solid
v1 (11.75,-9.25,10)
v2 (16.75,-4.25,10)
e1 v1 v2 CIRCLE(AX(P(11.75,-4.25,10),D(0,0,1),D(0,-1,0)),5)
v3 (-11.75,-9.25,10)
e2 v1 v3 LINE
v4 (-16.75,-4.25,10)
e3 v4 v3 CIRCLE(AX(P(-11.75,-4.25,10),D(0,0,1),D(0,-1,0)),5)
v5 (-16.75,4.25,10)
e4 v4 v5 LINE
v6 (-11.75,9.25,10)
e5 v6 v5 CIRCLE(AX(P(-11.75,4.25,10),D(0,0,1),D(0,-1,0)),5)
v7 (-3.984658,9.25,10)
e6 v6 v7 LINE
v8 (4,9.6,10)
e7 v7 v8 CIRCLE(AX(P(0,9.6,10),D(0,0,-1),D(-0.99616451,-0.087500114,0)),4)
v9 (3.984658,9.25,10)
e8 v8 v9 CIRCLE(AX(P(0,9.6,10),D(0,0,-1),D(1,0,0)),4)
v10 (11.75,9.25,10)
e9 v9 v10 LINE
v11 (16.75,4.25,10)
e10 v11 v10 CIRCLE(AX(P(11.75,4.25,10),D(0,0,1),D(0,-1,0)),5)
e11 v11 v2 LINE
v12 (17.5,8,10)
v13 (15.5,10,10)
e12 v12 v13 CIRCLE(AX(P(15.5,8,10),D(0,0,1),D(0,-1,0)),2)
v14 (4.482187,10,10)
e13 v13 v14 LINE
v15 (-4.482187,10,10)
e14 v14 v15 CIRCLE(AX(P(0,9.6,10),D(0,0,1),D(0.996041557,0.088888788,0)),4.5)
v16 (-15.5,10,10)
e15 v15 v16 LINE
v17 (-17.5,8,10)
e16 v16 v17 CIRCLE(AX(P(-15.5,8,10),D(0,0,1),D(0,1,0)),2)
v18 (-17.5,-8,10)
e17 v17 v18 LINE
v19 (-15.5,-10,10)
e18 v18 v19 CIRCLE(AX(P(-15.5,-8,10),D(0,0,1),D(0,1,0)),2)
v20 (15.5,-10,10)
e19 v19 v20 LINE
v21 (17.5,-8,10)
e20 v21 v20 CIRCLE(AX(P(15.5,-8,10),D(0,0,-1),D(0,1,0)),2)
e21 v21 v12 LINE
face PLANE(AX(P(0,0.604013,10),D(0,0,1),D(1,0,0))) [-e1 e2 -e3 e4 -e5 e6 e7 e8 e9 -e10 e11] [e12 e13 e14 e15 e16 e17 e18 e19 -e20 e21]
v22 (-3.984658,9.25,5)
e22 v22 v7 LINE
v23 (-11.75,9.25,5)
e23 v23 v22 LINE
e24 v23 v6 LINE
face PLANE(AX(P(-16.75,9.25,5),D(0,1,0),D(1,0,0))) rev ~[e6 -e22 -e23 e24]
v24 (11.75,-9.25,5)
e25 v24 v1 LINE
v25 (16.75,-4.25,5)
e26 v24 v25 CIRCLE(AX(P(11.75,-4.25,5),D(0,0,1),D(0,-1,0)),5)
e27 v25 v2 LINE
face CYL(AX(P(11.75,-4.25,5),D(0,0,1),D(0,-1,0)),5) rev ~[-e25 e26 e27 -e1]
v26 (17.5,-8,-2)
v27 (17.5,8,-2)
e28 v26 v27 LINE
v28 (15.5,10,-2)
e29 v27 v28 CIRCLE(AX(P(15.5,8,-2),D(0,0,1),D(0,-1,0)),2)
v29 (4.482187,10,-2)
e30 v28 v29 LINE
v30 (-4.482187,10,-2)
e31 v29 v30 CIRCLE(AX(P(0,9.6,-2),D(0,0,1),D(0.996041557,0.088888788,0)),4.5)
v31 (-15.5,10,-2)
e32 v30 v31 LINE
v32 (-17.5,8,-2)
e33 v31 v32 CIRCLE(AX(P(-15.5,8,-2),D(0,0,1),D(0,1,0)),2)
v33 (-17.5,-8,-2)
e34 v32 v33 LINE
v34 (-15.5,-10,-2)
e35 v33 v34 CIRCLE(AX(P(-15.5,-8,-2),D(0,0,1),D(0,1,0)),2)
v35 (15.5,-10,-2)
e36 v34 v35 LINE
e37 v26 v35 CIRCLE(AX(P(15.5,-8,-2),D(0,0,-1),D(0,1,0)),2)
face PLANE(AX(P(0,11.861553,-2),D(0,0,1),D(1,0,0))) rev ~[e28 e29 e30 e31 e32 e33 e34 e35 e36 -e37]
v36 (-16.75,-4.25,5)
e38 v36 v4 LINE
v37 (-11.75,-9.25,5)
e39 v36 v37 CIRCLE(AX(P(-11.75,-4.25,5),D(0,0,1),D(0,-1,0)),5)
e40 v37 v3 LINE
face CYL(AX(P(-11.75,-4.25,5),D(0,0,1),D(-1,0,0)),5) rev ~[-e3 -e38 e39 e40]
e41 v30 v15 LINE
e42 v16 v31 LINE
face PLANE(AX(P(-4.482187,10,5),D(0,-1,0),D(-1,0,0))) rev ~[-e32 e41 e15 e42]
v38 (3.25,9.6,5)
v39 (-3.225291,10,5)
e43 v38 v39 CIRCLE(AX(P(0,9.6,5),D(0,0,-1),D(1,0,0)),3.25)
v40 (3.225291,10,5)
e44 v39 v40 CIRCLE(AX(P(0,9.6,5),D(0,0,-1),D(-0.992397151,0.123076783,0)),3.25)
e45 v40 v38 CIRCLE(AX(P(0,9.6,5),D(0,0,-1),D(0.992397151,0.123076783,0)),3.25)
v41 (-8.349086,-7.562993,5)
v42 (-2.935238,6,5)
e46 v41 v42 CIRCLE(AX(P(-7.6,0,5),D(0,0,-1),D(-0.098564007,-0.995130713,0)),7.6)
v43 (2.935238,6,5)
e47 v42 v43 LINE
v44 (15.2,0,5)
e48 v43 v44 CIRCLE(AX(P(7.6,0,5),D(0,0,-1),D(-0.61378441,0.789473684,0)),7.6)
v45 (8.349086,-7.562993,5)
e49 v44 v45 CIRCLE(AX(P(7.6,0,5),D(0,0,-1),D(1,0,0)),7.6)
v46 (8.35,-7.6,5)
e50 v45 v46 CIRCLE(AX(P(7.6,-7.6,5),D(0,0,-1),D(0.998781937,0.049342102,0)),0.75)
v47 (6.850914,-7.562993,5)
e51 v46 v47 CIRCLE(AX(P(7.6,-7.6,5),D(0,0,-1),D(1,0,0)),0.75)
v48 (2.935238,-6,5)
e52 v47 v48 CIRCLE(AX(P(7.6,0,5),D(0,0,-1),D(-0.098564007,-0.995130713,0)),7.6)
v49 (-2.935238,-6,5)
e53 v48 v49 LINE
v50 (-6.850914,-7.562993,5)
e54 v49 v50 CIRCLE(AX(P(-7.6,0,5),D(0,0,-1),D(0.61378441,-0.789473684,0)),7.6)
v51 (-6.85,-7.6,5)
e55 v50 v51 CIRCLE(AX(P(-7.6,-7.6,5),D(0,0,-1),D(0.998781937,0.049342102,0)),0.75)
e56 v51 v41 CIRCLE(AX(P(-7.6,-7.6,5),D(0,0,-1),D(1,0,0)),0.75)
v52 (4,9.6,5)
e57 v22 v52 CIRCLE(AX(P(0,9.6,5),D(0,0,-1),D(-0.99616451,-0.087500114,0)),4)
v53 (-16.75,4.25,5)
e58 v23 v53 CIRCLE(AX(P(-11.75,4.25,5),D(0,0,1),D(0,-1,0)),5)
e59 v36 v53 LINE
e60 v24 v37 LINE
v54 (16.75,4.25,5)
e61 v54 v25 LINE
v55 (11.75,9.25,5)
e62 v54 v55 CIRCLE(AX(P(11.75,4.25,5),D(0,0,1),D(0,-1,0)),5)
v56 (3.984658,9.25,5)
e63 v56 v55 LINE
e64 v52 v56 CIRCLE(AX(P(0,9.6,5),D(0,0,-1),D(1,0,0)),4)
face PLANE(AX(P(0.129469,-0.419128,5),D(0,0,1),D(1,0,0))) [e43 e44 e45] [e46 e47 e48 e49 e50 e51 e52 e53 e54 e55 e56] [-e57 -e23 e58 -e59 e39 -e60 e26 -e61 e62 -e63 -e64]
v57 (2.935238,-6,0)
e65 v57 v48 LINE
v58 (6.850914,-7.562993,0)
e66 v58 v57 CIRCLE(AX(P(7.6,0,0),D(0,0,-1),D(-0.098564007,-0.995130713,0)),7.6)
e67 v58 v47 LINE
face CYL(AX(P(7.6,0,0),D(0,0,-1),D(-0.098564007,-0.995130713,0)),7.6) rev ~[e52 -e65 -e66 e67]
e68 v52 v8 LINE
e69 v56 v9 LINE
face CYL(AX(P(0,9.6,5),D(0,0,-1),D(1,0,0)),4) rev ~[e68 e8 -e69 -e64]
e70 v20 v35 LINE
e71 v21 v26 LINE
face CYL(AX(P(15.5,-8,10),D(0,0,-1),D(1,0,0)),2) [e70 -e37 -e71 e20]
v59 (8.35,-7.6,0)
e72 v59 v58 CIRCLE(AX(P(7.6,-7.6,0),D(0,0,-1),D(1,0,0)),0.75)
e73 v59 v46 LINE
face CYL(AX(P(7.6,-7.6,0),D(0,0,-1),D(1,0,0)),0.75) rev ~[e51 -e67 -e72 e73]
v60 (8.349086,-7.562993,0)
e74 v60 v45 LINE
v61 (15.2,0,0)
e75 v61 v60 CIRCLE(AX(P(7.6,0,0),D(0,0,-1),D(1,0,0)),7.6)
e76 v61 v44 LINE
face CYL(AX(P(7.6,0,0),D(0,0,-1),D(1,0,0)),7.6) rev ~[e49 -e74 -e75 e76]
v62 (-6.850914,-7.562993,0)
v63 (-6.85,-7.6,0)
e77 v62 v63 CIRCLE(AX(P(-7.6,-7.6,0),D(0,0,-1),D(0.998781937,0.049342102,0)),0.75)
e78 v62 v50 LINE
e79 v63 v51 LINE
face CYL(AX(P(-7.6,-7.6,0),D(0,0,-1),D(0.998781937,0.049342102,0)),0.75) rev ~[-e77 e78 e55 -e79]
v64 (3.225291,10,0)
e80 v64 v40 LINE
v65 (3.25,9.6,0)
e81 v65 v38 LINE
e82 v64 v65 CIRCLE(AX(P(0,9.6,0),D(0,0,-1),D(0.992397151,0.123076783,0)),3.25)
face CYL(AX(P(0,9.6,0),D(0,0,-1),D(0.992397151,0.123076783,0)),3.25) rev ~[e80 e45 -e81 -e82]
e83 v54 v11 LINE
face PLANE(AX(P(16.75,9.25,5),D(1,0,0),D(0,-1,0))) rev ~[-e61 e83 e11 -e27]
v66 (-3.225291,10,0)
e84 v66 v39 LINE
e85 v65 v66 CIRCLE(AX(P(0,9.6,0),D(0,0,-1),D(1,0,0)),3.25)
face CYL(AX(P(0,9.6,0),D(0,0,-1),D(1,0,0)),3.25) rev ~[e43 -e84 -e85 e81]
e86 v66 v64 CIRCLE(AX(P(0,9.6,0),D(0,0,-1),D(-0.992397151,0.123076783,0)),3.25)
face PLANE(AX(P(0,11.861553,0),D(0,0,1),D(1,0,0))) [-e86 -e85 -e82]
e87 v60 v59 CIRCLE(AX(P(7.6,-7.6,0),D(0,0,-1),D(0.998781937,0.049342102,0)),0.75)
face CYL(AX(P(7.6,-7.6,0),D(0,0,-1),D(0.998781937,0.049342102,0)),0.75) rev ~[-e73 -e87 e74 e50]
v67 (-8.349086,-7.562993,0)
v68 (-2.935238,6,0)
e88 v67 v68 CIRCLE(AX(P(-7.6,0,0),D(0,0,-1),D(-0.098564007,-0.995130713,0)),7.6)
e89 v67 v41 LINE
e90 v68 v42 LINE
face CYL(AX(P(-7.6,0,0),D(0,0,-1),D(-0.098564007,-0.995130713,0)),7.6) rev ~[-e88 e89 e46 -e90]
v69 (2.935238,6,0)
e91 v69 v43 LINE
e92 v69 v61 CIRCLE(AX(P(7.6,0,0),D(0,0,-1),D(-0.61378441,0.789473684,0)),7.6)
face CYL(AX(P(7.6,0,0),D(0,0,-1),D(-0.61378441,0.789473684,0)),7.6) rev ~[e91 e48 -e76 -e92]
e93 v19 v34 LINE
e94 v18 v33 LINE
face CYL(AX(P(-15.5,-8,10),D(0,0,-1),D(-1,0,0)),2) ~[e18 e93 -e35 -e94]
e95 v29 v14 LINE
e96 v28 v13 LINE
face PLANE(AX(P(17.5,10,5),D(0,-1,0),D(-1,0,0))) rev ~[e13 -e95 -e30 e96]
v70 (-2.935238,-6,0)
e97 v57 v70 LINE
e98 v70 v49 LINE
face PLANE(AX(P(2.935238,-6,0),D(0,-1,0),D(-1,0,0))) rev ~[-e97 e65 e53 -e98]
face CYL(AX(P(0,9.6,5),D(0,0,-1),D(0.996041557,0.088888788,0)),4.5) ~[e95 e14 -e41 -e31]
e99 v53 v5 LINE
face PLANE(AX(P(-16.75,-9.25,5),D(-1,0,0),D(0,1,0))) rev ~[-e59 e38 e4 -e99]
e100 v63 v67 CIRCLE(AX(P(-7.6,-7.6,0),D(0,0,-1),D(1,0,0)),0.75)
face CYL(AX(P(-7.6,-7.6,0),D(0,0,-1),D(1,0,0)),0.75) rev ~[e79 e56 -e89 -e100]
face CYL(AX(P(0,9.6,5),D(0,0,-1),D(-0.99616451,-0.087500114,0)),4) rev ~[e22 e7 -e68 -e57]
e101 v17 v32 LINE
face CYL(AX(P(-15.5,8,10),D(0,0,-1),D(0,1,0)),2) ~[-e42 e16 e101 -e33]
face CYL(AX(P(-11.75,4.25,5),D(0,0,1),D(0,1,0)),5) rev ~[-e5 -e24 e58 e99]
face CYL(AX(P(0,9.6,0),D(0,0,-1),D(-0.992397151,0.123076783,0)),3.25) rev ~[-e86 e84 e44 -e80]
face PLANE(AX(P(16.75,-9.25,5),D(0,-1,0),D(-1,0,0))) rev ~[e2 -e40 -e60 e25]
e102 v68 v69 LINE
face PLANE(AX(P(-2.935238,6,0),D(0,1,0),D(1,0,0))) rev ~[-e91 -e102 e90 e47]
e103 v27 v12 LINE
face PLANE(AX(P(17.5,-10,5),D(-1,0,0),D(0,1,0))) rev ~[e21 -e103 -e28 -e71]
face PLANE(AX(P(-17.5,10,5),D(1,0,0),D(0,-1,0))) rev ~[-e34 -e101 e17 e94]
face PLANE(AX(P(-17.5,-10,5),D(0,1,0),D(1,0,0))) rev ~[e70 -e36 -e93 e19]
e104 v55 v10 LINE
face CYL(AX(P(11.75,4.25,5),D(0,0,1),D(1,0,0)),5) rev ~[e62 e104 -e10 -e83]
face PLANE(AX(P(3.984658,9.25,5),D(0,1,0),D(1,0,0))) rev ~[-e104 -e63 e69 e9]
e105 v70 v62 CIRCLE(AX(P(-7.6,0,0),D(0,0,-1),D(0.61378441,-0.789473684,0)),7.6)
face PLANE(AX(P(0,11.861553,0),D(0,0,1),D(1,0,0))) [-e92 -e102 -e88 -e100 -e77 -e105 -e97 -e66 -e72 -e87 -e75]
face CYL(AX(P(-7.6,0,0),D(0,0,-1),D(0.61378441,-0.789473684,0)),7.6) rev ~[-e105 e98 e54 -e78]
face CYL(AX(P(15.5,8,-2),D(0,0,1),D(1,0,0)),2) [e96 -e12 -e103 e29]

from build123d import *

# Parameters (mm, degrees)
F1_DEPTH = 2
F2_DEPTH = 5
F4_DEPTH = 5
F5_R     = 2
F6_R     = 5


# Not quite as in the source:
# - a feature names something its author has since deleted; it is built from what else it names


with BuildPart() as f1:
    # F0 (on Top) → F1 (new body)
    with BuildSketch(Plane.XY):
        with BuildLine():
            ThreePointArc((4.4821870069, 10), (0, 14.100000456), (-4.4821870069, 10))
            Line((-4.4821870069, 10), (-3.2252907411, 10))
            ThreePointArc((-3.2252907411, 10), (0, 12.850000456), (3.2252907411, 10))
            Line((3.2252907411, 10), (4.4821870069, 10))
        make_face()
        with BuildLine():
            Line((3.2252907411, 10), (-3.2252907411, 10))
            ThreePointArc((-3.2252907411, 10), (-0.2003810013, 6.3561836525), (3.25, 9.600000456))
            ThreePointArc((3.25, 9.600000456), (3.2438168034, 9.8003814573), (3.2252907411, 10))
        make_face()
        with BuildLine():
            ThreePointArc((3.2252907411, 10), (0, 12.850000456), (-3.2252907411, 10))
            Line((-3.2252907411, 10), (3.2252907411, 10))
        make_face()
        with BuildLine():
            ThreePointArc((-2.9352384841, 6), (-0.7731344117, 3.3397464334), (0, 0))
            ThreePointArc((0, 0), (0.7731344117, 3.3397464334), (2.9352384841, 6))
            Line((2.9352384841, 6), (2.699999392, 6))
            ThreePointArc((2.699999392, 6), (0, 5.100000456), (-2.699999392, 6))
            Line((-2.699999392, 6), (-2.9352384841, 6))
        make_face()
        with BuildLine():
            ThreePointArc((2.9352384841, -6), (0.7731344117, -3.3397464334), (0, 0))
            ThreePointArc((0, 0), (-0.7731344117, -3.3397464334), (-2.9352384841, -6))
            Line((-2.9352384841, -6), (2.9352384841, -6))
        make_face()
        with BuildLine():
            ThreePointArc((-4.4821870069, 10), (-4.1104683878, 7.768593993), (-2.699999392, 6))
            Line((-2.699999392, 6), (2.699999392, 6))
            ThreePointArc((2.699999392, 6), (4.0249221896, 7.5875389364), (4.5, 9.600000456))
            ThreePointArc((4.5, 9.600000456), (4.495544546, 9.8001984442), (4.4821870069, 10))
            Line((4.4821870069, 10), (3.2252907411, 10))
            ThreePointArc((3.2252907411, 10), (3.2438168034, 9.8003814573), (3.25, 9.600000456))
            ThreePointArc((3.25, 9.600000456), (-0.2003810013, 6.3561836525), (-3.2252907411, 10))
            Line((-3.2252907411, 10), (-4.4821870069, 10))
        make_face()
        with BuildLine():
            ThreePointArc((-2.9352384841, -6), (-0.7731344117, -3.3397464334), (0, 0))
            ThreePointArc((0, 0), (-0.7731344117, 3.3397464334), (-2.9352384841, 6))
            ThreePointArc((-2.9352384841, 6), (-14.6584577236, 2.8174766307), (-8.3490864524, -7.5629934211))
            ThreePointArc((-8.3490864524, -7.5629934211), (-7.6, -6.85), (-6.8509135476, -7.5629934211))
            ThreePointArc((-6.8509135476, -7.5629934211), (-4.7825233693, -7.0584577236), (-2.9352384841, -6))
        make_face()
        with BuildLine():
            ThreePointArc((2.9352384841, 6), (0.7731344117, 3.3397464334), (0, 0))
            ThreePointArc((0, 0), (0.7731344117, -3.3397464334), (2.9352384841, -6))
            ThreePointArc((2.9352384841, -6), (4.7825233693, -7.0584577236), (6.8509135476, -7.5629934211))
            ThreePointArc((6.8509135476, -7.5629934211), (7.6, -6.85), (8.3490864524, -7.5629934211))
            ThreePointArc((8.3490864524, -7.5629934211), (13.2326306926, -5.1023006067), (15.2, 0))
            ThreePointArc((15.2, 0), (10.9397464334, 6.8268655883), (2.9352384841, 6))
        make_face()
        with BuildLine():
            ThreePointArc((-8.3490864524, -7.5629934211), (-14.6584577236, 2.8174766307), (-2.9352384841, 6))
            Line((-2.9352384841, 6), (-2.699999392, 6))
            ThreePointArc((-2.699999392, 6), (-4.1104683878, 7.768593993), (-4.4821870069, 10))
            Line((-4.4821870069, 10), (-17.5, 10))
            Line((-17.5, 10), (-17.5, -10))
            Line((-17.5, -10), (17.5, -10))
            Line((17.5, -10), (17.5, 10))
            Line((17.5, 10), (4.4821870069, 10))
            ThreePointArc((4.4821870069, 10), (4.495544546, 9.8001984442), (4.5, 9.600000456))
            ThreePointArc((4.5, 9.600000456), (4.0249221896, 7.5875389364), (2.699999392, 6))
            Line((2.699999392, 6), (2.9352384841, 6))
            ThreePointArc((2.9352384841, 6), (10.9397464334, 6.8268655883), (15.2, 0))
            ThreePointArc((15.2, 0), (13.2326306926, -5.1023006067), (8.3490864524, -7.5629934211))
            ThreePointArc((8.3490864524, -7.5629934211), (8.3497715783, -7.5814910734), (8.35, -7.6))
            ThreePointArc((8.35, -7.6), (7.5814910734, -8.3497715783), (6.8509135476, -7.5629934211))
            ThreePointArc((6.8509135476, -7.5629934211), (4.7825233693, -7.0584577236), (2.9352384841, -6))
            Line((2.9352384841, -6), (-2.9352384841, -6))
            ThreePointArc((-2.9352384841, -6), (-4.7825233693, -7.0584577236), (-6.8509135476, -7.5629934211))
            ThreePointArc((-6.8509135476, -7.5629934211), (-6.8502284217, -7.5814910734), (-6.85, -7.6))
            ThreePointArc((-6.85, -7.6), (-7.6185089266, -8.3497715783), (-8.3490864524, -7.5629934211))
        make_face()
        with BuildLine():
            ThreePointArc((-6.8509135476, -7.5629934211), (-7.6, -6.85), (-8.3490864524, -7.5629934211))
            ThreePointArc((-8.3490864524, -7.5629934211), (-7.6, -7.6), (-6.8509135476, -7.5629934211))
        make_face()
        with BuildLine():
            ThreePointArc((-6.8509135476, -7.5629934211), (-7.6, -7.6), (-8.3490864524, -7.5629934211))
            ThreePointArc((-8.3490864524, -7.5629934211), (-7.6185089266, -8.3497715783), (-6.85, -7.6))
            ThreePointArc((-6.85, -7.6), (-6.8502284217, -7.5814910734), (-6.8509135476, -7.5629934211))
        make_face()
        with BuildLine():
            ThreePointArc((8.3490864524, -7.5629934211), (7.6, -6.85), (6.8509135476, -7.5629934211))
            ThreePointArc((6.8509135476, -7.5629934211), (7.6, -7.6), (8.3490864524, -7.5629934211))
        make_face()
        with BuildLine():
            ThreePointArc((8.3490864524, -7.5629934211), (7.6, -7.6), (6.8509135476, -7.5629934211))
            ThreePointArc((6.8509135476, -7.5629934211), (7.5814910734, -8.3497715783), (8.35, -7.6))
            ThreePointArc((8.35, -7.6), (8.3497715783, -7.5814910734), (8.3490864524, -7.5629934211))
        make_face()
        with BuildLine():
            Line((2.699999392, 6), (-2.699999392, 6))
            ThreePointArc((-2.699999392, 6), (0, 5.100000456), (2.699999392, 6))
        make_face()
    extrude(amount=-F1_DEPTH)

    # F0 (on Top) → F2 (join)
    with BuildSketch(Plane.XY):
        with BuildLine():
            ThreePointArc((-8.3490864524, -7.5629934211), (-14.6584577236, 2.8174766307), (-2.9352384841, 6))
            Line((-2.9352384841, 6), (-2.699999392, 6))
            ThreePointArc((-2.699999392, 6), (-4.1104683878, 7.768593993), (-4.4821870069, 10))
            Line((-4.4821870069, 10), (-17.5, 10))
            Line((-17.5, 10), (-17.5, -10))
            Line((-17.5, -10), (17.5, -10))
            Line((17.5, -10), (17.5, 10))
            Line((17.5, 10), (4.4821870069, 10))
            ThreePointArc((4.4821870069, 10), (4.495544546, 9.8001984442), (4.5, 9.600000456))
            ThreePointArc((4.5, 9.600000456), (4.0249221896, 7.5875389364), (2.699999392, 6))
            Line((2.699999392, 6), (2.9352384841, 6))
            ThreePointArc((2.9352384841, 6), (10.9397464334, 6.8268655883), (15.2, 0))
            ThreePointArc((15.2, 0), (13.2326306926, -5.1023006067), (8.3490864524, -7.5629934211))
            ThreePointArc((8.3490864524, -7.5629934211), (8.3497715783, -7.5814910734), (8.35, -7.6))
            ThreePointArc((8.35, -7.6), (7.5814910734, -8.3497715783), (6.8509135476, -7.5629934211))
            ThreePointArc((6.8509135476, -7.5629934211), (4.7825233693, -7.0584577236), (2.9352384841, -6))
            Line((2.9352384841, -6), (-2.9352384841, -6))
            ThreePointArc((-2.9352384841, -6), (-4.7825233693, -7.0584577236), (-6.8509135476, -7.5629934211))
            ThreePointArc((-6.8509135476, -7.5629934211), (-6.8502284217, -7.5814910734), (-6.85, -7.6))
            ThreePointArc((-6.85, -7.6), (-7.6185089266, -8.3497715783), (-8.3490864524, -7.5629934211))
        make_face()
        with BuildLine():
            ThreePointArc((4.4821870069, 10), (0, 14.100000456), (-4.4821870069, 10))
            Line((-4.4821870069, 10), (-3.2252907411, 10))
            ThreePointArc((-3.2252907411, 10), (0, 12.850000456), (3.2252907411, 10))
            Line((3.2252907411, 10), (4.4821870069, 10))
        make_face()
        with BuildLine():
            ThreePointArc((-4.4821870069, 10), (-4.1104683878, 7.768593993), (-2.699999392, 6))
            Line((-2.699999392, 6), (2.699999392, 6))
            ThreePointArc((2.699999392, 6), (4.0249221896, 7.5875389364), (4.5, 9.600000456))
            ThreePointArc((4.5, 9.600000456), (4.495544546, 9.8001984442), (4.4821870069, 10))
            Line((4.4821870069, 10), (3.2252907411, 10))
            ThreePointArc((3.2252907411, 10), (3.2438168034, 9.8003814573), (3.25, 9.600000456))
            ThreePointArc((3.25, 9.600000456), (-0.2003810013, 6.3561836525), (-3.2252907411, 10))
            Line((-3.2252907411, 10), (-4.4821870069, 10))
        make_face()
    extrude(amount=F2_DEPTH)

    # F3 (on face) → F4 (join)
    with BuildSketch(Plane.XY.offset(5)):
        with BuildLine():
            Line((17.5, -10), (17.5, 10))
            Line((17.5, 10), (4.4821870069, 10))
            ThreePointArc((4.4821870069, 10), (0, 14.100000456), (-4.4821870069, 10))
            Line((-4.4821870069, 10), (-17.5, 10))
            Line((-17.5, 10), (-17.5, -10))
            Line((-17.5, -10), (17.5, -10))
        make_face()
        with BuildLine():
            Line((3.9846580381, 9.25), (16.75, 9.25))
            Line((16.75, 9.25), (16.75, -9.25))
            Line((16.75, -9.25), (-16.75, -9.25))
            Line((-16.75, -9.25), (-16.75, 9.25))
            Line((-16.75, 9.25), (-3.9846580381, 9.25))
            ThreePointArc((-3.9846580381, 9.25), (-0.1751682727, 13.5961631249), (4, 9.600000456))
            ThreePointArc((4, 9.600000456), (3.9961626689, 9.4248321833), (3.9846580381, 9.25))
        make_face(mode=Mode.SUBTRACT)
    extrude(amount=F4_DEPTH)

    # F5
    f5_edges = [f1.edges().sort_by_distance(p)[0] for p in [
        (-17.5, 10, 4),
        (17.5, 10, 4),
        (17.5, -10, 4),
        (-17.5, -10, 4),
    ]]
    fillet(f5_edges, radius=F5_R)

    # F6
    f6_edges = [f1.edges().sort_by_distance(p)[0] for p in [
        (16.75, -9.25, 7.5),
        (-16.75, -9.25, 7.5),
        (16.75, 9.25, 7.5),
        (-16.75, 9.25, 7.5),
    ]]
    fillet(f6_edges, radius=F6_R)


solid = f1.part
